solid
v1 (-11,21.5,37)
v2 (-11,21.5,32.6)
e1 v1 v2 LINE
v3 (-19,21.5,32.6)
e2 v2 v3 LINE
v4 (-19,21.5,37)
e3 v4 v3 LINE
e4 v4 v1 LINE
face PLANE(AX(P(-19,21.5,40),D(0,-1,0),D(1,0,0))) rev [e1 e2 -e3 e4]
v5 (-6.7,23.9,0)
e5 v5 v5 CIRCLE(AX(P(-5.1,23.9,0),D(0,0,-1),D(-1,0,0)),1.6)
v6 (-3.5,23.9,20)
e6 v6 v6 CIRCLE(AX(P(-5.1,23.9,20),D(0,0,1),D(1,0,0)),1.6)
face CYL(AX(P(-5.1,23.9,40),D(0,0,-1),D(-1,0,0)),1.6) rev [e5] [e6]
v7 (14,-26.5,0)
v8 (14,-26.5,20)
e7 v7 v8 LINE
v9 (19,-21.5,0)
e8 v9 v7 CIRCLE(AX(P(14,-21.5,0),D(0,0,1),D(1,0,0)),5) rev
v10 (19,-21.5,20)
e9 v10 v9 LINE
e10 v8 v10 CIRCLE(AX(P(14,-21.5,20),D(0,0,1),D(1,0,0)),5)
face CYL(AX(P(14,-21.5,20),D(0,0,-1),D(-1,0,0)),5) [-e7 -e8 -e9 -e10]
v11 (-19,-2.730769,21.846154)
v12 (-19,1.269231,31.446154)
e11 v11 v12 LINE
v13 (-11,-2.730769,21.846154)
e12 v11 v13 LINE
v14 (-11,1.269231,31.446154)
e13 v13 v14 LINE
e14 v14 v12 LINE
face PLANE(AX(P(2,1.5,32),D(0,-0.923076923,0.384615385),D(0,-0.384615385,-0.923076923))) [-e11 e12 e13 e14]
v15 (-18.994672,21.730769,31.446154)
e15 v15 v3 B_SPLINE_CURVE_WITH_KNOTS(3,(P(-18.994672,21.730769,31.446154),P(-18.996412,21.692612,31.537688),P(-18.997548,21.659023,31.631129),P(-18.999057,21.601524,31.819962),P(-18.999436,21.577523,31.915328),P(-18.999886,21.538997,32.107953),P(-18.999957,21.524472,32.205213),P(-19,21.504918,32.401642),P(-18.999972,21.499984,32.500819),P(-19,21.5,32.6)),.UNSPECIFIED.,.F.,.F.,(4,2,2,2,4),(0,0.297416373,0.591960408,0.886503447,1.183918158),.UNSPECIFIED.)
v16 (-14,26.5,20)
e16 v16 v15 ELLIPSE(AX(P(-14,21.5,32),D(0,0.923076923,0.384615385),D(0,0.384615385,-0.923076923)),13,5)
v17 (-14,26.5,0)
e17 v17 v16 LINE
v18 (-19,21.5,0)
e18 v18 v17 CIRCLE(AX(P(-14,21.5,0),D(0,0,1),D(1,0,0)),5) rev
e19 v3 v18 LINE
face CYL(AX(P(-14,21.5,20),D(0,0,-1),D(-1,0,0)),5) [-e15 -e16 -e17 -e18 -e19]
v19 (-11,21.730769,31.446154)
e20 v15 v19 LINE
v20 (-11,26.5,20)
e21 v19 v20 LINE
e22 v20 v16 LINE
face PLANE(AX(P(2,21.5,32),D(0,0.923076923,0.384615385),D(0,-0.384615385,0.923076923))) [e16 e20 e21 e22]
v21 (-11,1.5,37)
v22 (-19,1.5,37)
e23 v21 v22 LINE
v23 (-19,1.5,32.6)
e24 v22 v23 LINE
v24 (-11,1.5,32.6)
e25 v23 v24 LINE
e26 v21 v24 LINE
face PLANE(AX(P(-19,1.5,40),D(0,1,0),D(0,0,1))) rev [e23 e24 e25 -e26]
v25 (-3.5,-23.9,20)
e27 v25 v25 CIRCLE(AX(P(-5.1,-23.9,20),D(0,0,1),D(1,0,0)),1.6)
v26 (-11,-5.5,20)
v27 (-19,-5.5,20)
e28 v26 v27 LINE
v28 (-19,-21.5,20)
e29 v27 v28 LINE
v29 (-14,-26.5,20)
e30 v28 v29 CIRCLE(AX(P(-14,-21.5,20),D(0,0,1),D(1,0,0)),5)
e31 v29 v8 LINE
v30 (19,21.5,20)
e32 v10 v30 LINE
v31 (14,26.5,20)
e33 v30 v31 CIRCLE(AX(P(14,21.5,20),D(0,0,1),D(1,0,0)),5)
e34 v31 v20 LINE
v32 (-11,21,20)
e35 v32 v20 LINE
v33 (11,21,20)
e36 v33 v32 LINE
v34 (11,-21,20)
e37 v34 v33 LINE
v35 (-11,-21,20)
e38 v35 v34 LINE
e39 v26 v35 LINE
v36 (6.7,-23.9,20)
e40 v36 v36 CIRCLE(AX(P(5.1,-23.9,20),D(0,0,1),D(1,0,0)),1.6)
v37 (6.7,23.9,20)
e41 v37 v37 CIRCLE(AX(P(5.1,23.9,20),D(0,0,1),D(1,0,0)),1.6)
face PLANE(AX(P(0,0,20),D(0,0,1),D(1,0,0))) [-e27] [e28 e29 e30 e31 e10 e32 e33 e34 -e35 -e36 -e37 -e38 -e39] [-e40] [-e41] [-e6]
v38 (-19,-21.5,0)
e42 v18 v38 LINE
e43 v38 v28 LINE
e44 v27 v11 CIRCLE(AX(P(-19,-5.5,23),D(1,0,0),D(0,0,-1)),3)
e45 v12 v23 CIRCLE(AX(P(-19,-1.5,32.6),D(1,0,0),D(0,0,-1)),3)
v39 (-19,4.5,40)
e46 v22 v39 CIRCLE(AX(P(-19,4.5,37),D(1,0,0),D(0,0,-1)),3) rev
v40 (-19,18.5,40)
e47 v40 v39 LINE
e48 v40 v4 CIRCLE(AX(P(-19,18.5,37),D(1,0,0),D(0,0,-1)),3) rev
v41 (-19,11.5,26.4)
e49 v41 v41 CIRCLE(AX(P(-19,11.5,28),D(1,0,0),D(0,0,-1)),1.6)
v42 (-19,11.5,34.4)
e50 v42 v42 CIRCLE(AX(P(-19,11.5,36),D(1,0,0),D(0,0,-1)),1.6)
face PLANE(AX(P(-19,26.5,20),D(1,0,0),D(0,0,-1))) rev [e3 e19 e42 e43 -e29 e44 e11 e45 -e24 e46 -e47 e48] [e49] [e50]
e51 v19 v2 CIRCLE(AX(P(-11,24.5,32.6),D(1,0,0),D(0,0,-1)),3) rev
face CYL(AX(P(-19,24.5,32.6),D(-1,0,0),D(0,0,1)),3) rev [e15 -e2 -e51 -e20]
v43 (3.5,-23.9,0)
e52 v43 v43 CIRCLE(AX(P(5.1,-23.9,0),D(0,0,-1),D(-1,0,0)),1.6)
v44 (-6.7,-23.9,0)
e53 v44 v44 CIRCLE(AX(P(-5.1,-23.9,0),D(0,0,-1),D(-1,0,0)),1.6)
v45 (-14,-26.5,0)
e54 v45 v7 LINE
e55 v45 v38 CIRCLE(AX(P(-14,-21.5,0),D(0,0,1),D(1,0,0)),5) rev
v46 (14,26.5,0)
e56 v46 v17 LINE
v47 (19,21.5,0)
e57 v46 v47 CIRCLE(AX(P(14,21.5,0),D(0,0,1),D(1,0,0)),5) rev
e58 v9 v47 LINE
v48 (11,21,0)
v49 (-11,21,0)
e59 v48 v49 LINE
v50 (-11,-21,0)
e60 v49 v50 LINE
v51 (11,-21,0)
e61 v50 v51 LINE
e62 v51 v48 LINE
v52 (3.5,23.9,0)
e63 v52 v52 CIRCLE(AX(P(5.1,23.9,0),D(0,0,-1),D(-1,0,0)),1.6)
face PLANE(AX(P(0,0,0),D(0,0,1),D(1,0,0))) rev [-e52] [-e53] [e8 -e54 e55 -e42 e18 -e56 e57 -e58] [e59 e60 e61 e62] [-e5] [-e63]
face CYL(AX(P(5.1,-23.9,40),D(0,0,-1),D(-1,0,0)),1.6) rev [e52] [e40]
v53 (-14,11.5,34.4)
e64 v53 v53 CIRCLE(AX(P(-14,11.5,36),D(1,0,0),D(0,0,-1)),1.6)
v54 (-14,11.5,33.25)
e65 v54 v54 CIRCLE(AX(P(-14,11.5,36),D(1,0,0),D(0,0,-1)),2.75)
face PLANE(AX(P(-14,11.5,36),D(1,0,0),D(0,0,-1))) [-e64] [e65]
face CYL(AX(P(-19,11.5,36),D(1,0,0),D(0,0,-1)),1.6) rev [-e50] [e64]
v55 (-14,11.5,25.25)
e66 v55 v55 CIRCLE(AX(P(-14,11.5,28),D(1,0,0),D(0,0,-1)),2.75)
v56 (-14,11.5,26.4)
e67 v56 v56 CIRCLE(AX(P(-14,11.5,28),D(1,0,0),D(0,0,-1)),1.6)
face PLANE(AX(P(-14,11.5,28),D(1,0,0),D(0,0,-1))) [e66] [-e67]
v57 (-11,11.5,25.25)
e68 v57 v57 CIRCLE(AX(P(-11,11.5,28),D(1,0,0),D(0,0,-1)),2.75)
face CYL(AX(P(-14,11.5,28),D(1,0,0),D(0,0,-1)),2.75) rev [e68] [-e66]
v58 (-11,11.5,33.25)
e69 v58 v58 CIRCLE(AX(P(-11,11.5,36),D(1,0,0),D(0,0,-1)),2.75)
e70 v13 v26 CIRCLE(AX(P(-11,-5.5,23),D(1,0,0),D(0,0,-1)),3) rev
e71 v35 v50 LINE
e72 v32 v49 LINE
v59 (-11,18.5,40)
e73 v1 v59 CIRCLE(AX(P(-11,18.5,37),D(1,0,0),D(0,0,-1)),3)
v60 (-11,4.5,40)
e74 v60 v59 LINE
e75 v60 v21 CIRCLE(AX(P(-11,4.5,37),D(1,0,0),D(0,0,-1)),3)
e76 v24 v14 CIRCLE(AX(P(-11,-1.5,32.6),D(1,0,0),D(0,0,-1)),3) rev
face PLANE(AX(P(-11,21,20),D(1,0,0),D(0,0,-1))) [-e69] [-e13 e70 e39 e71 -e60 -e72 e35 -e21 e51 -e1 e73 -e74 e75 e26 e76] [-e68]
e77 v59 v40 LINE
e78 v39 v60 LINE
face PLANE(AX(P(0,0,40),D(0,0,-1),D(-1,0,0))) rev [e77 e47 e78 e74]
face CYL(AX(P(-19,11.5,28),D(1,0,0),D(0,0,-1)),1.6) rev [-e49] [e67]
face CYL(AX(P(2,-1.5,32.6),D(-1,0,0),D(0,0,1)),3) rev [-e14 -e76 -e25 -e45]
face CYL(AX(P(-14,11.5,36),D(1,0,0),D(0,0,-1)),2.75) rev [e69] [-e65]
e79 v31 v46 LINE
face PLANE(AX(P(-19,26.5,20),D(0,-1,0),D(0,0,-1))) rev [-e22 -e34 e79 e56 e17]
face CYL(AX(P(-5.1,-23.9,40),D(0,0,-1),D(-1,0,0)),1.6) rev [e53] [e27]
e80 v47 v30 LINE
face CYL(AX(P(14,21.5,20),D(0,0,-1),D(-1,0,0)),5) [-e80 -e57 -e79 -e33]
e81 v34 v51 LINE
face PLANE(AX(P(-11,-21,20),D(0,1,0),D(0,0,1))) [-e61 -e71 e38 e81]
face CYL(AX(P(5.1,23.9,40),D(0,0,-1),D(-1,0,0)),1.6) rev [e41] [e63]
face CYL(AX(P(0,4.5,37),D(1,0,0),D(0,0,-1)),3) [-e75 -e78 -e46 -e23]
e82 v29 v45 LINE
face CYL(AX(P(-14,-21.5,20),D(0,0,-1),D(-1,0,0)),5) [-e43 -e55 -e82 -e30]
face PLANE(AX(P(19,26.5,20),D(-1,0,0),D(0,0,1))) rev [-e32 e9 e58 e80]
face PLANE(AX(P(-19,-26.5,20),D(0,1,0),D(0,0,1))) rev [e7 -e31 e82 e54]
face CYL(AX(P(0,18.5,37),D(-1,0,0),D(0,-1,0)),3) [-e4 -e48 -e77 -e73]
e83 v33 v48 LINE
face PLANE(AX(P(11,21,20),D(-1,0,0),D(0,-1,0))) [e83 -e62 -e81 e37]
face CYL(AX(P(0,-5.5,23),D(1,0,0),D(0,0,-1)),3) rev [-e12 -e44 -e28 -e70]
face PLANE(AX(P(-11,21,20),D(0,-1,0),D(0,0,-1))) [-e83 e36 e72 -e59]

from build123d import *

# Parameters (mm, degrees)
SKETCH1_W           = 38
SKETCH1_H           = 53
SKETCH1_W_2         = 22
SKETCH1_H_2         = 42
BOSS_EXTRUDE1_DEPTH = 20
SKETCH2_W           = 8
SKETCH2_H           = 20
BOSS_EXTRUDE2_DEPTH = 20
SKETCH3_R           = 2.75
SKETCH3_R_2         = 1.6
CUT_EXTRUDE1_DEPTH  = 3
SKETCH3_2_R         = 1.6
CUT_EXTRUDE2_DEPTH  = 57.588426379
SKETCH4_R           = 1.6
CUT_EXTRUDE3_DEPTH  = 52.606685613
BOSS_EXTRUDE3_DEPTH = 8
FILLET2_R           = 3
FILLET1_R           = 5


with BuildPart() as part:
    # Sketch1 → Boss-Extrude1 (new body)
    with BuildSketch(Plane.XY):
        Rectangle(SKETCH1_W, SKETCH1_H)
        Rectangle(SKETCH1_W_2, SKETCH1_H_2, mode=Mode.SUBTRACT)
    extrude(amount=BOSS_EXTRUDE1_DEPTH)

    # Sketch2 → Boss-Extrude2 (add)
    with BuildSketch(Plane.XY.offset(20)):
        with Locations((-15, 11.5)):
            Rectangle(SKETCH2_W, SKETCH2_H)
    extrude(amount=BOSS_EXTRUDE2_DEPTH)

    # Sketch3 → Cut-Extrude1 (cut)
    # profile 1 of 2: a face of its own
    with BuildSketch(Plane(origin=(-11, 0, 0), x_dir=(0, 0, -1), z_dir=(1, 0, 0))):
        with Locations((-36, 11.5)):
            Circle(SKETCH3_R)
        with Locations((-36, 11.5)):
            Circle(SKETCH3_R_2, mode=Mode.SUBTRACT)
    # profile 2 of 2: a face of its own
    with BuildSketch(Plane(origin=(-11, 0, 0), x_dir=(0, 0, -1), z_dir=(1, 0, 0))):
        with Locations((-28, 11.5)):
            Circle(SKETCH3_R)
        with Locations((-28, 11.5)):
            Circle(SKETCH3_R_2, mode=Mode.SUBTRACT)
    extrude(amount=-CUT_EXTRUDE1_DEPTH, mode=Mode.SUBTRACT)

    # Sketch3<2> → Cut-Extrude2 (cut, through all)
    with BuildSketch(Plane(origin=(-11, 0, 0), x_dir=(0, 0, -1), z_dir=(1, 0, 0))):
        with Locations((-36, 11.5)):
            Circle(SKETCH3_2_R)
        with Locations((-28, 11.5)):
            Circle(SKETCH3_2_R)
    extrude(amount=-CUT_EXTRUDE2_DEPTH, mode=Mode.SUBTRACT)

    # Sketch4 → Cut-Extrude3 (cut, through all)
    with BuildSketch(Plane(origin=(0, 0, 0), x_dir=(-1, 0, 0), z_dir=(0, 0, -1))):
        with Locations((-5.1, -23.9)):
            Circle(SKETCH4_R)
        with Locations((5.1, -23.9)):
            Circle(SKETCH4_R)
        with Locations((-5.1, 23.9)):
            Circle(SKETCH4_R)
        with Locations((5.1, 23.9)):
            Circle(SKETCH4_R)
    extrude(amount=-CUT_EXTRUDE3_DEPTH, mode=Mode.SUBTRACT)

    # Sketch5 → Boss-Extrude3 (add)
    with BuildSketch(Plane.ZY.offset(19)):
        Polygon((32, 1.5), (20, -3.5), (20, 1.5), align=None)
        Polygon((20, 26.5), (20, 21.5), (32, 21.5), align=None)
    extrude(amount=-BOSS_EXTRUDE3_DEPTH)

    # Fillet2
    fillet2_edges = [part.edges().sort_by_distance(p)[0] for p in [
        (-15, 21.5, 32),
        (-15, 1.5, 40),
        (-15, 21.5, 40),
        (-15, -3.5, 20),
        (-15, 1.5, 32),
    ]]
    fillet(fillet2_edges, radius=FILLET2_R)

    # Fillet1
    fillet1_edges = [part.edges().sort_by_distance(p)[0] for p in [
        (-19, -26.5, 10),
        (19, -26.5, 10),
        (-19, 26.5, 10),
        (19, 26.5, 10),
    ]]
    fillet(fillet1_edges, radius=FILLET1_R - 0.0001)  # a hair under: the kernel refuses the full size


solid = part.part
